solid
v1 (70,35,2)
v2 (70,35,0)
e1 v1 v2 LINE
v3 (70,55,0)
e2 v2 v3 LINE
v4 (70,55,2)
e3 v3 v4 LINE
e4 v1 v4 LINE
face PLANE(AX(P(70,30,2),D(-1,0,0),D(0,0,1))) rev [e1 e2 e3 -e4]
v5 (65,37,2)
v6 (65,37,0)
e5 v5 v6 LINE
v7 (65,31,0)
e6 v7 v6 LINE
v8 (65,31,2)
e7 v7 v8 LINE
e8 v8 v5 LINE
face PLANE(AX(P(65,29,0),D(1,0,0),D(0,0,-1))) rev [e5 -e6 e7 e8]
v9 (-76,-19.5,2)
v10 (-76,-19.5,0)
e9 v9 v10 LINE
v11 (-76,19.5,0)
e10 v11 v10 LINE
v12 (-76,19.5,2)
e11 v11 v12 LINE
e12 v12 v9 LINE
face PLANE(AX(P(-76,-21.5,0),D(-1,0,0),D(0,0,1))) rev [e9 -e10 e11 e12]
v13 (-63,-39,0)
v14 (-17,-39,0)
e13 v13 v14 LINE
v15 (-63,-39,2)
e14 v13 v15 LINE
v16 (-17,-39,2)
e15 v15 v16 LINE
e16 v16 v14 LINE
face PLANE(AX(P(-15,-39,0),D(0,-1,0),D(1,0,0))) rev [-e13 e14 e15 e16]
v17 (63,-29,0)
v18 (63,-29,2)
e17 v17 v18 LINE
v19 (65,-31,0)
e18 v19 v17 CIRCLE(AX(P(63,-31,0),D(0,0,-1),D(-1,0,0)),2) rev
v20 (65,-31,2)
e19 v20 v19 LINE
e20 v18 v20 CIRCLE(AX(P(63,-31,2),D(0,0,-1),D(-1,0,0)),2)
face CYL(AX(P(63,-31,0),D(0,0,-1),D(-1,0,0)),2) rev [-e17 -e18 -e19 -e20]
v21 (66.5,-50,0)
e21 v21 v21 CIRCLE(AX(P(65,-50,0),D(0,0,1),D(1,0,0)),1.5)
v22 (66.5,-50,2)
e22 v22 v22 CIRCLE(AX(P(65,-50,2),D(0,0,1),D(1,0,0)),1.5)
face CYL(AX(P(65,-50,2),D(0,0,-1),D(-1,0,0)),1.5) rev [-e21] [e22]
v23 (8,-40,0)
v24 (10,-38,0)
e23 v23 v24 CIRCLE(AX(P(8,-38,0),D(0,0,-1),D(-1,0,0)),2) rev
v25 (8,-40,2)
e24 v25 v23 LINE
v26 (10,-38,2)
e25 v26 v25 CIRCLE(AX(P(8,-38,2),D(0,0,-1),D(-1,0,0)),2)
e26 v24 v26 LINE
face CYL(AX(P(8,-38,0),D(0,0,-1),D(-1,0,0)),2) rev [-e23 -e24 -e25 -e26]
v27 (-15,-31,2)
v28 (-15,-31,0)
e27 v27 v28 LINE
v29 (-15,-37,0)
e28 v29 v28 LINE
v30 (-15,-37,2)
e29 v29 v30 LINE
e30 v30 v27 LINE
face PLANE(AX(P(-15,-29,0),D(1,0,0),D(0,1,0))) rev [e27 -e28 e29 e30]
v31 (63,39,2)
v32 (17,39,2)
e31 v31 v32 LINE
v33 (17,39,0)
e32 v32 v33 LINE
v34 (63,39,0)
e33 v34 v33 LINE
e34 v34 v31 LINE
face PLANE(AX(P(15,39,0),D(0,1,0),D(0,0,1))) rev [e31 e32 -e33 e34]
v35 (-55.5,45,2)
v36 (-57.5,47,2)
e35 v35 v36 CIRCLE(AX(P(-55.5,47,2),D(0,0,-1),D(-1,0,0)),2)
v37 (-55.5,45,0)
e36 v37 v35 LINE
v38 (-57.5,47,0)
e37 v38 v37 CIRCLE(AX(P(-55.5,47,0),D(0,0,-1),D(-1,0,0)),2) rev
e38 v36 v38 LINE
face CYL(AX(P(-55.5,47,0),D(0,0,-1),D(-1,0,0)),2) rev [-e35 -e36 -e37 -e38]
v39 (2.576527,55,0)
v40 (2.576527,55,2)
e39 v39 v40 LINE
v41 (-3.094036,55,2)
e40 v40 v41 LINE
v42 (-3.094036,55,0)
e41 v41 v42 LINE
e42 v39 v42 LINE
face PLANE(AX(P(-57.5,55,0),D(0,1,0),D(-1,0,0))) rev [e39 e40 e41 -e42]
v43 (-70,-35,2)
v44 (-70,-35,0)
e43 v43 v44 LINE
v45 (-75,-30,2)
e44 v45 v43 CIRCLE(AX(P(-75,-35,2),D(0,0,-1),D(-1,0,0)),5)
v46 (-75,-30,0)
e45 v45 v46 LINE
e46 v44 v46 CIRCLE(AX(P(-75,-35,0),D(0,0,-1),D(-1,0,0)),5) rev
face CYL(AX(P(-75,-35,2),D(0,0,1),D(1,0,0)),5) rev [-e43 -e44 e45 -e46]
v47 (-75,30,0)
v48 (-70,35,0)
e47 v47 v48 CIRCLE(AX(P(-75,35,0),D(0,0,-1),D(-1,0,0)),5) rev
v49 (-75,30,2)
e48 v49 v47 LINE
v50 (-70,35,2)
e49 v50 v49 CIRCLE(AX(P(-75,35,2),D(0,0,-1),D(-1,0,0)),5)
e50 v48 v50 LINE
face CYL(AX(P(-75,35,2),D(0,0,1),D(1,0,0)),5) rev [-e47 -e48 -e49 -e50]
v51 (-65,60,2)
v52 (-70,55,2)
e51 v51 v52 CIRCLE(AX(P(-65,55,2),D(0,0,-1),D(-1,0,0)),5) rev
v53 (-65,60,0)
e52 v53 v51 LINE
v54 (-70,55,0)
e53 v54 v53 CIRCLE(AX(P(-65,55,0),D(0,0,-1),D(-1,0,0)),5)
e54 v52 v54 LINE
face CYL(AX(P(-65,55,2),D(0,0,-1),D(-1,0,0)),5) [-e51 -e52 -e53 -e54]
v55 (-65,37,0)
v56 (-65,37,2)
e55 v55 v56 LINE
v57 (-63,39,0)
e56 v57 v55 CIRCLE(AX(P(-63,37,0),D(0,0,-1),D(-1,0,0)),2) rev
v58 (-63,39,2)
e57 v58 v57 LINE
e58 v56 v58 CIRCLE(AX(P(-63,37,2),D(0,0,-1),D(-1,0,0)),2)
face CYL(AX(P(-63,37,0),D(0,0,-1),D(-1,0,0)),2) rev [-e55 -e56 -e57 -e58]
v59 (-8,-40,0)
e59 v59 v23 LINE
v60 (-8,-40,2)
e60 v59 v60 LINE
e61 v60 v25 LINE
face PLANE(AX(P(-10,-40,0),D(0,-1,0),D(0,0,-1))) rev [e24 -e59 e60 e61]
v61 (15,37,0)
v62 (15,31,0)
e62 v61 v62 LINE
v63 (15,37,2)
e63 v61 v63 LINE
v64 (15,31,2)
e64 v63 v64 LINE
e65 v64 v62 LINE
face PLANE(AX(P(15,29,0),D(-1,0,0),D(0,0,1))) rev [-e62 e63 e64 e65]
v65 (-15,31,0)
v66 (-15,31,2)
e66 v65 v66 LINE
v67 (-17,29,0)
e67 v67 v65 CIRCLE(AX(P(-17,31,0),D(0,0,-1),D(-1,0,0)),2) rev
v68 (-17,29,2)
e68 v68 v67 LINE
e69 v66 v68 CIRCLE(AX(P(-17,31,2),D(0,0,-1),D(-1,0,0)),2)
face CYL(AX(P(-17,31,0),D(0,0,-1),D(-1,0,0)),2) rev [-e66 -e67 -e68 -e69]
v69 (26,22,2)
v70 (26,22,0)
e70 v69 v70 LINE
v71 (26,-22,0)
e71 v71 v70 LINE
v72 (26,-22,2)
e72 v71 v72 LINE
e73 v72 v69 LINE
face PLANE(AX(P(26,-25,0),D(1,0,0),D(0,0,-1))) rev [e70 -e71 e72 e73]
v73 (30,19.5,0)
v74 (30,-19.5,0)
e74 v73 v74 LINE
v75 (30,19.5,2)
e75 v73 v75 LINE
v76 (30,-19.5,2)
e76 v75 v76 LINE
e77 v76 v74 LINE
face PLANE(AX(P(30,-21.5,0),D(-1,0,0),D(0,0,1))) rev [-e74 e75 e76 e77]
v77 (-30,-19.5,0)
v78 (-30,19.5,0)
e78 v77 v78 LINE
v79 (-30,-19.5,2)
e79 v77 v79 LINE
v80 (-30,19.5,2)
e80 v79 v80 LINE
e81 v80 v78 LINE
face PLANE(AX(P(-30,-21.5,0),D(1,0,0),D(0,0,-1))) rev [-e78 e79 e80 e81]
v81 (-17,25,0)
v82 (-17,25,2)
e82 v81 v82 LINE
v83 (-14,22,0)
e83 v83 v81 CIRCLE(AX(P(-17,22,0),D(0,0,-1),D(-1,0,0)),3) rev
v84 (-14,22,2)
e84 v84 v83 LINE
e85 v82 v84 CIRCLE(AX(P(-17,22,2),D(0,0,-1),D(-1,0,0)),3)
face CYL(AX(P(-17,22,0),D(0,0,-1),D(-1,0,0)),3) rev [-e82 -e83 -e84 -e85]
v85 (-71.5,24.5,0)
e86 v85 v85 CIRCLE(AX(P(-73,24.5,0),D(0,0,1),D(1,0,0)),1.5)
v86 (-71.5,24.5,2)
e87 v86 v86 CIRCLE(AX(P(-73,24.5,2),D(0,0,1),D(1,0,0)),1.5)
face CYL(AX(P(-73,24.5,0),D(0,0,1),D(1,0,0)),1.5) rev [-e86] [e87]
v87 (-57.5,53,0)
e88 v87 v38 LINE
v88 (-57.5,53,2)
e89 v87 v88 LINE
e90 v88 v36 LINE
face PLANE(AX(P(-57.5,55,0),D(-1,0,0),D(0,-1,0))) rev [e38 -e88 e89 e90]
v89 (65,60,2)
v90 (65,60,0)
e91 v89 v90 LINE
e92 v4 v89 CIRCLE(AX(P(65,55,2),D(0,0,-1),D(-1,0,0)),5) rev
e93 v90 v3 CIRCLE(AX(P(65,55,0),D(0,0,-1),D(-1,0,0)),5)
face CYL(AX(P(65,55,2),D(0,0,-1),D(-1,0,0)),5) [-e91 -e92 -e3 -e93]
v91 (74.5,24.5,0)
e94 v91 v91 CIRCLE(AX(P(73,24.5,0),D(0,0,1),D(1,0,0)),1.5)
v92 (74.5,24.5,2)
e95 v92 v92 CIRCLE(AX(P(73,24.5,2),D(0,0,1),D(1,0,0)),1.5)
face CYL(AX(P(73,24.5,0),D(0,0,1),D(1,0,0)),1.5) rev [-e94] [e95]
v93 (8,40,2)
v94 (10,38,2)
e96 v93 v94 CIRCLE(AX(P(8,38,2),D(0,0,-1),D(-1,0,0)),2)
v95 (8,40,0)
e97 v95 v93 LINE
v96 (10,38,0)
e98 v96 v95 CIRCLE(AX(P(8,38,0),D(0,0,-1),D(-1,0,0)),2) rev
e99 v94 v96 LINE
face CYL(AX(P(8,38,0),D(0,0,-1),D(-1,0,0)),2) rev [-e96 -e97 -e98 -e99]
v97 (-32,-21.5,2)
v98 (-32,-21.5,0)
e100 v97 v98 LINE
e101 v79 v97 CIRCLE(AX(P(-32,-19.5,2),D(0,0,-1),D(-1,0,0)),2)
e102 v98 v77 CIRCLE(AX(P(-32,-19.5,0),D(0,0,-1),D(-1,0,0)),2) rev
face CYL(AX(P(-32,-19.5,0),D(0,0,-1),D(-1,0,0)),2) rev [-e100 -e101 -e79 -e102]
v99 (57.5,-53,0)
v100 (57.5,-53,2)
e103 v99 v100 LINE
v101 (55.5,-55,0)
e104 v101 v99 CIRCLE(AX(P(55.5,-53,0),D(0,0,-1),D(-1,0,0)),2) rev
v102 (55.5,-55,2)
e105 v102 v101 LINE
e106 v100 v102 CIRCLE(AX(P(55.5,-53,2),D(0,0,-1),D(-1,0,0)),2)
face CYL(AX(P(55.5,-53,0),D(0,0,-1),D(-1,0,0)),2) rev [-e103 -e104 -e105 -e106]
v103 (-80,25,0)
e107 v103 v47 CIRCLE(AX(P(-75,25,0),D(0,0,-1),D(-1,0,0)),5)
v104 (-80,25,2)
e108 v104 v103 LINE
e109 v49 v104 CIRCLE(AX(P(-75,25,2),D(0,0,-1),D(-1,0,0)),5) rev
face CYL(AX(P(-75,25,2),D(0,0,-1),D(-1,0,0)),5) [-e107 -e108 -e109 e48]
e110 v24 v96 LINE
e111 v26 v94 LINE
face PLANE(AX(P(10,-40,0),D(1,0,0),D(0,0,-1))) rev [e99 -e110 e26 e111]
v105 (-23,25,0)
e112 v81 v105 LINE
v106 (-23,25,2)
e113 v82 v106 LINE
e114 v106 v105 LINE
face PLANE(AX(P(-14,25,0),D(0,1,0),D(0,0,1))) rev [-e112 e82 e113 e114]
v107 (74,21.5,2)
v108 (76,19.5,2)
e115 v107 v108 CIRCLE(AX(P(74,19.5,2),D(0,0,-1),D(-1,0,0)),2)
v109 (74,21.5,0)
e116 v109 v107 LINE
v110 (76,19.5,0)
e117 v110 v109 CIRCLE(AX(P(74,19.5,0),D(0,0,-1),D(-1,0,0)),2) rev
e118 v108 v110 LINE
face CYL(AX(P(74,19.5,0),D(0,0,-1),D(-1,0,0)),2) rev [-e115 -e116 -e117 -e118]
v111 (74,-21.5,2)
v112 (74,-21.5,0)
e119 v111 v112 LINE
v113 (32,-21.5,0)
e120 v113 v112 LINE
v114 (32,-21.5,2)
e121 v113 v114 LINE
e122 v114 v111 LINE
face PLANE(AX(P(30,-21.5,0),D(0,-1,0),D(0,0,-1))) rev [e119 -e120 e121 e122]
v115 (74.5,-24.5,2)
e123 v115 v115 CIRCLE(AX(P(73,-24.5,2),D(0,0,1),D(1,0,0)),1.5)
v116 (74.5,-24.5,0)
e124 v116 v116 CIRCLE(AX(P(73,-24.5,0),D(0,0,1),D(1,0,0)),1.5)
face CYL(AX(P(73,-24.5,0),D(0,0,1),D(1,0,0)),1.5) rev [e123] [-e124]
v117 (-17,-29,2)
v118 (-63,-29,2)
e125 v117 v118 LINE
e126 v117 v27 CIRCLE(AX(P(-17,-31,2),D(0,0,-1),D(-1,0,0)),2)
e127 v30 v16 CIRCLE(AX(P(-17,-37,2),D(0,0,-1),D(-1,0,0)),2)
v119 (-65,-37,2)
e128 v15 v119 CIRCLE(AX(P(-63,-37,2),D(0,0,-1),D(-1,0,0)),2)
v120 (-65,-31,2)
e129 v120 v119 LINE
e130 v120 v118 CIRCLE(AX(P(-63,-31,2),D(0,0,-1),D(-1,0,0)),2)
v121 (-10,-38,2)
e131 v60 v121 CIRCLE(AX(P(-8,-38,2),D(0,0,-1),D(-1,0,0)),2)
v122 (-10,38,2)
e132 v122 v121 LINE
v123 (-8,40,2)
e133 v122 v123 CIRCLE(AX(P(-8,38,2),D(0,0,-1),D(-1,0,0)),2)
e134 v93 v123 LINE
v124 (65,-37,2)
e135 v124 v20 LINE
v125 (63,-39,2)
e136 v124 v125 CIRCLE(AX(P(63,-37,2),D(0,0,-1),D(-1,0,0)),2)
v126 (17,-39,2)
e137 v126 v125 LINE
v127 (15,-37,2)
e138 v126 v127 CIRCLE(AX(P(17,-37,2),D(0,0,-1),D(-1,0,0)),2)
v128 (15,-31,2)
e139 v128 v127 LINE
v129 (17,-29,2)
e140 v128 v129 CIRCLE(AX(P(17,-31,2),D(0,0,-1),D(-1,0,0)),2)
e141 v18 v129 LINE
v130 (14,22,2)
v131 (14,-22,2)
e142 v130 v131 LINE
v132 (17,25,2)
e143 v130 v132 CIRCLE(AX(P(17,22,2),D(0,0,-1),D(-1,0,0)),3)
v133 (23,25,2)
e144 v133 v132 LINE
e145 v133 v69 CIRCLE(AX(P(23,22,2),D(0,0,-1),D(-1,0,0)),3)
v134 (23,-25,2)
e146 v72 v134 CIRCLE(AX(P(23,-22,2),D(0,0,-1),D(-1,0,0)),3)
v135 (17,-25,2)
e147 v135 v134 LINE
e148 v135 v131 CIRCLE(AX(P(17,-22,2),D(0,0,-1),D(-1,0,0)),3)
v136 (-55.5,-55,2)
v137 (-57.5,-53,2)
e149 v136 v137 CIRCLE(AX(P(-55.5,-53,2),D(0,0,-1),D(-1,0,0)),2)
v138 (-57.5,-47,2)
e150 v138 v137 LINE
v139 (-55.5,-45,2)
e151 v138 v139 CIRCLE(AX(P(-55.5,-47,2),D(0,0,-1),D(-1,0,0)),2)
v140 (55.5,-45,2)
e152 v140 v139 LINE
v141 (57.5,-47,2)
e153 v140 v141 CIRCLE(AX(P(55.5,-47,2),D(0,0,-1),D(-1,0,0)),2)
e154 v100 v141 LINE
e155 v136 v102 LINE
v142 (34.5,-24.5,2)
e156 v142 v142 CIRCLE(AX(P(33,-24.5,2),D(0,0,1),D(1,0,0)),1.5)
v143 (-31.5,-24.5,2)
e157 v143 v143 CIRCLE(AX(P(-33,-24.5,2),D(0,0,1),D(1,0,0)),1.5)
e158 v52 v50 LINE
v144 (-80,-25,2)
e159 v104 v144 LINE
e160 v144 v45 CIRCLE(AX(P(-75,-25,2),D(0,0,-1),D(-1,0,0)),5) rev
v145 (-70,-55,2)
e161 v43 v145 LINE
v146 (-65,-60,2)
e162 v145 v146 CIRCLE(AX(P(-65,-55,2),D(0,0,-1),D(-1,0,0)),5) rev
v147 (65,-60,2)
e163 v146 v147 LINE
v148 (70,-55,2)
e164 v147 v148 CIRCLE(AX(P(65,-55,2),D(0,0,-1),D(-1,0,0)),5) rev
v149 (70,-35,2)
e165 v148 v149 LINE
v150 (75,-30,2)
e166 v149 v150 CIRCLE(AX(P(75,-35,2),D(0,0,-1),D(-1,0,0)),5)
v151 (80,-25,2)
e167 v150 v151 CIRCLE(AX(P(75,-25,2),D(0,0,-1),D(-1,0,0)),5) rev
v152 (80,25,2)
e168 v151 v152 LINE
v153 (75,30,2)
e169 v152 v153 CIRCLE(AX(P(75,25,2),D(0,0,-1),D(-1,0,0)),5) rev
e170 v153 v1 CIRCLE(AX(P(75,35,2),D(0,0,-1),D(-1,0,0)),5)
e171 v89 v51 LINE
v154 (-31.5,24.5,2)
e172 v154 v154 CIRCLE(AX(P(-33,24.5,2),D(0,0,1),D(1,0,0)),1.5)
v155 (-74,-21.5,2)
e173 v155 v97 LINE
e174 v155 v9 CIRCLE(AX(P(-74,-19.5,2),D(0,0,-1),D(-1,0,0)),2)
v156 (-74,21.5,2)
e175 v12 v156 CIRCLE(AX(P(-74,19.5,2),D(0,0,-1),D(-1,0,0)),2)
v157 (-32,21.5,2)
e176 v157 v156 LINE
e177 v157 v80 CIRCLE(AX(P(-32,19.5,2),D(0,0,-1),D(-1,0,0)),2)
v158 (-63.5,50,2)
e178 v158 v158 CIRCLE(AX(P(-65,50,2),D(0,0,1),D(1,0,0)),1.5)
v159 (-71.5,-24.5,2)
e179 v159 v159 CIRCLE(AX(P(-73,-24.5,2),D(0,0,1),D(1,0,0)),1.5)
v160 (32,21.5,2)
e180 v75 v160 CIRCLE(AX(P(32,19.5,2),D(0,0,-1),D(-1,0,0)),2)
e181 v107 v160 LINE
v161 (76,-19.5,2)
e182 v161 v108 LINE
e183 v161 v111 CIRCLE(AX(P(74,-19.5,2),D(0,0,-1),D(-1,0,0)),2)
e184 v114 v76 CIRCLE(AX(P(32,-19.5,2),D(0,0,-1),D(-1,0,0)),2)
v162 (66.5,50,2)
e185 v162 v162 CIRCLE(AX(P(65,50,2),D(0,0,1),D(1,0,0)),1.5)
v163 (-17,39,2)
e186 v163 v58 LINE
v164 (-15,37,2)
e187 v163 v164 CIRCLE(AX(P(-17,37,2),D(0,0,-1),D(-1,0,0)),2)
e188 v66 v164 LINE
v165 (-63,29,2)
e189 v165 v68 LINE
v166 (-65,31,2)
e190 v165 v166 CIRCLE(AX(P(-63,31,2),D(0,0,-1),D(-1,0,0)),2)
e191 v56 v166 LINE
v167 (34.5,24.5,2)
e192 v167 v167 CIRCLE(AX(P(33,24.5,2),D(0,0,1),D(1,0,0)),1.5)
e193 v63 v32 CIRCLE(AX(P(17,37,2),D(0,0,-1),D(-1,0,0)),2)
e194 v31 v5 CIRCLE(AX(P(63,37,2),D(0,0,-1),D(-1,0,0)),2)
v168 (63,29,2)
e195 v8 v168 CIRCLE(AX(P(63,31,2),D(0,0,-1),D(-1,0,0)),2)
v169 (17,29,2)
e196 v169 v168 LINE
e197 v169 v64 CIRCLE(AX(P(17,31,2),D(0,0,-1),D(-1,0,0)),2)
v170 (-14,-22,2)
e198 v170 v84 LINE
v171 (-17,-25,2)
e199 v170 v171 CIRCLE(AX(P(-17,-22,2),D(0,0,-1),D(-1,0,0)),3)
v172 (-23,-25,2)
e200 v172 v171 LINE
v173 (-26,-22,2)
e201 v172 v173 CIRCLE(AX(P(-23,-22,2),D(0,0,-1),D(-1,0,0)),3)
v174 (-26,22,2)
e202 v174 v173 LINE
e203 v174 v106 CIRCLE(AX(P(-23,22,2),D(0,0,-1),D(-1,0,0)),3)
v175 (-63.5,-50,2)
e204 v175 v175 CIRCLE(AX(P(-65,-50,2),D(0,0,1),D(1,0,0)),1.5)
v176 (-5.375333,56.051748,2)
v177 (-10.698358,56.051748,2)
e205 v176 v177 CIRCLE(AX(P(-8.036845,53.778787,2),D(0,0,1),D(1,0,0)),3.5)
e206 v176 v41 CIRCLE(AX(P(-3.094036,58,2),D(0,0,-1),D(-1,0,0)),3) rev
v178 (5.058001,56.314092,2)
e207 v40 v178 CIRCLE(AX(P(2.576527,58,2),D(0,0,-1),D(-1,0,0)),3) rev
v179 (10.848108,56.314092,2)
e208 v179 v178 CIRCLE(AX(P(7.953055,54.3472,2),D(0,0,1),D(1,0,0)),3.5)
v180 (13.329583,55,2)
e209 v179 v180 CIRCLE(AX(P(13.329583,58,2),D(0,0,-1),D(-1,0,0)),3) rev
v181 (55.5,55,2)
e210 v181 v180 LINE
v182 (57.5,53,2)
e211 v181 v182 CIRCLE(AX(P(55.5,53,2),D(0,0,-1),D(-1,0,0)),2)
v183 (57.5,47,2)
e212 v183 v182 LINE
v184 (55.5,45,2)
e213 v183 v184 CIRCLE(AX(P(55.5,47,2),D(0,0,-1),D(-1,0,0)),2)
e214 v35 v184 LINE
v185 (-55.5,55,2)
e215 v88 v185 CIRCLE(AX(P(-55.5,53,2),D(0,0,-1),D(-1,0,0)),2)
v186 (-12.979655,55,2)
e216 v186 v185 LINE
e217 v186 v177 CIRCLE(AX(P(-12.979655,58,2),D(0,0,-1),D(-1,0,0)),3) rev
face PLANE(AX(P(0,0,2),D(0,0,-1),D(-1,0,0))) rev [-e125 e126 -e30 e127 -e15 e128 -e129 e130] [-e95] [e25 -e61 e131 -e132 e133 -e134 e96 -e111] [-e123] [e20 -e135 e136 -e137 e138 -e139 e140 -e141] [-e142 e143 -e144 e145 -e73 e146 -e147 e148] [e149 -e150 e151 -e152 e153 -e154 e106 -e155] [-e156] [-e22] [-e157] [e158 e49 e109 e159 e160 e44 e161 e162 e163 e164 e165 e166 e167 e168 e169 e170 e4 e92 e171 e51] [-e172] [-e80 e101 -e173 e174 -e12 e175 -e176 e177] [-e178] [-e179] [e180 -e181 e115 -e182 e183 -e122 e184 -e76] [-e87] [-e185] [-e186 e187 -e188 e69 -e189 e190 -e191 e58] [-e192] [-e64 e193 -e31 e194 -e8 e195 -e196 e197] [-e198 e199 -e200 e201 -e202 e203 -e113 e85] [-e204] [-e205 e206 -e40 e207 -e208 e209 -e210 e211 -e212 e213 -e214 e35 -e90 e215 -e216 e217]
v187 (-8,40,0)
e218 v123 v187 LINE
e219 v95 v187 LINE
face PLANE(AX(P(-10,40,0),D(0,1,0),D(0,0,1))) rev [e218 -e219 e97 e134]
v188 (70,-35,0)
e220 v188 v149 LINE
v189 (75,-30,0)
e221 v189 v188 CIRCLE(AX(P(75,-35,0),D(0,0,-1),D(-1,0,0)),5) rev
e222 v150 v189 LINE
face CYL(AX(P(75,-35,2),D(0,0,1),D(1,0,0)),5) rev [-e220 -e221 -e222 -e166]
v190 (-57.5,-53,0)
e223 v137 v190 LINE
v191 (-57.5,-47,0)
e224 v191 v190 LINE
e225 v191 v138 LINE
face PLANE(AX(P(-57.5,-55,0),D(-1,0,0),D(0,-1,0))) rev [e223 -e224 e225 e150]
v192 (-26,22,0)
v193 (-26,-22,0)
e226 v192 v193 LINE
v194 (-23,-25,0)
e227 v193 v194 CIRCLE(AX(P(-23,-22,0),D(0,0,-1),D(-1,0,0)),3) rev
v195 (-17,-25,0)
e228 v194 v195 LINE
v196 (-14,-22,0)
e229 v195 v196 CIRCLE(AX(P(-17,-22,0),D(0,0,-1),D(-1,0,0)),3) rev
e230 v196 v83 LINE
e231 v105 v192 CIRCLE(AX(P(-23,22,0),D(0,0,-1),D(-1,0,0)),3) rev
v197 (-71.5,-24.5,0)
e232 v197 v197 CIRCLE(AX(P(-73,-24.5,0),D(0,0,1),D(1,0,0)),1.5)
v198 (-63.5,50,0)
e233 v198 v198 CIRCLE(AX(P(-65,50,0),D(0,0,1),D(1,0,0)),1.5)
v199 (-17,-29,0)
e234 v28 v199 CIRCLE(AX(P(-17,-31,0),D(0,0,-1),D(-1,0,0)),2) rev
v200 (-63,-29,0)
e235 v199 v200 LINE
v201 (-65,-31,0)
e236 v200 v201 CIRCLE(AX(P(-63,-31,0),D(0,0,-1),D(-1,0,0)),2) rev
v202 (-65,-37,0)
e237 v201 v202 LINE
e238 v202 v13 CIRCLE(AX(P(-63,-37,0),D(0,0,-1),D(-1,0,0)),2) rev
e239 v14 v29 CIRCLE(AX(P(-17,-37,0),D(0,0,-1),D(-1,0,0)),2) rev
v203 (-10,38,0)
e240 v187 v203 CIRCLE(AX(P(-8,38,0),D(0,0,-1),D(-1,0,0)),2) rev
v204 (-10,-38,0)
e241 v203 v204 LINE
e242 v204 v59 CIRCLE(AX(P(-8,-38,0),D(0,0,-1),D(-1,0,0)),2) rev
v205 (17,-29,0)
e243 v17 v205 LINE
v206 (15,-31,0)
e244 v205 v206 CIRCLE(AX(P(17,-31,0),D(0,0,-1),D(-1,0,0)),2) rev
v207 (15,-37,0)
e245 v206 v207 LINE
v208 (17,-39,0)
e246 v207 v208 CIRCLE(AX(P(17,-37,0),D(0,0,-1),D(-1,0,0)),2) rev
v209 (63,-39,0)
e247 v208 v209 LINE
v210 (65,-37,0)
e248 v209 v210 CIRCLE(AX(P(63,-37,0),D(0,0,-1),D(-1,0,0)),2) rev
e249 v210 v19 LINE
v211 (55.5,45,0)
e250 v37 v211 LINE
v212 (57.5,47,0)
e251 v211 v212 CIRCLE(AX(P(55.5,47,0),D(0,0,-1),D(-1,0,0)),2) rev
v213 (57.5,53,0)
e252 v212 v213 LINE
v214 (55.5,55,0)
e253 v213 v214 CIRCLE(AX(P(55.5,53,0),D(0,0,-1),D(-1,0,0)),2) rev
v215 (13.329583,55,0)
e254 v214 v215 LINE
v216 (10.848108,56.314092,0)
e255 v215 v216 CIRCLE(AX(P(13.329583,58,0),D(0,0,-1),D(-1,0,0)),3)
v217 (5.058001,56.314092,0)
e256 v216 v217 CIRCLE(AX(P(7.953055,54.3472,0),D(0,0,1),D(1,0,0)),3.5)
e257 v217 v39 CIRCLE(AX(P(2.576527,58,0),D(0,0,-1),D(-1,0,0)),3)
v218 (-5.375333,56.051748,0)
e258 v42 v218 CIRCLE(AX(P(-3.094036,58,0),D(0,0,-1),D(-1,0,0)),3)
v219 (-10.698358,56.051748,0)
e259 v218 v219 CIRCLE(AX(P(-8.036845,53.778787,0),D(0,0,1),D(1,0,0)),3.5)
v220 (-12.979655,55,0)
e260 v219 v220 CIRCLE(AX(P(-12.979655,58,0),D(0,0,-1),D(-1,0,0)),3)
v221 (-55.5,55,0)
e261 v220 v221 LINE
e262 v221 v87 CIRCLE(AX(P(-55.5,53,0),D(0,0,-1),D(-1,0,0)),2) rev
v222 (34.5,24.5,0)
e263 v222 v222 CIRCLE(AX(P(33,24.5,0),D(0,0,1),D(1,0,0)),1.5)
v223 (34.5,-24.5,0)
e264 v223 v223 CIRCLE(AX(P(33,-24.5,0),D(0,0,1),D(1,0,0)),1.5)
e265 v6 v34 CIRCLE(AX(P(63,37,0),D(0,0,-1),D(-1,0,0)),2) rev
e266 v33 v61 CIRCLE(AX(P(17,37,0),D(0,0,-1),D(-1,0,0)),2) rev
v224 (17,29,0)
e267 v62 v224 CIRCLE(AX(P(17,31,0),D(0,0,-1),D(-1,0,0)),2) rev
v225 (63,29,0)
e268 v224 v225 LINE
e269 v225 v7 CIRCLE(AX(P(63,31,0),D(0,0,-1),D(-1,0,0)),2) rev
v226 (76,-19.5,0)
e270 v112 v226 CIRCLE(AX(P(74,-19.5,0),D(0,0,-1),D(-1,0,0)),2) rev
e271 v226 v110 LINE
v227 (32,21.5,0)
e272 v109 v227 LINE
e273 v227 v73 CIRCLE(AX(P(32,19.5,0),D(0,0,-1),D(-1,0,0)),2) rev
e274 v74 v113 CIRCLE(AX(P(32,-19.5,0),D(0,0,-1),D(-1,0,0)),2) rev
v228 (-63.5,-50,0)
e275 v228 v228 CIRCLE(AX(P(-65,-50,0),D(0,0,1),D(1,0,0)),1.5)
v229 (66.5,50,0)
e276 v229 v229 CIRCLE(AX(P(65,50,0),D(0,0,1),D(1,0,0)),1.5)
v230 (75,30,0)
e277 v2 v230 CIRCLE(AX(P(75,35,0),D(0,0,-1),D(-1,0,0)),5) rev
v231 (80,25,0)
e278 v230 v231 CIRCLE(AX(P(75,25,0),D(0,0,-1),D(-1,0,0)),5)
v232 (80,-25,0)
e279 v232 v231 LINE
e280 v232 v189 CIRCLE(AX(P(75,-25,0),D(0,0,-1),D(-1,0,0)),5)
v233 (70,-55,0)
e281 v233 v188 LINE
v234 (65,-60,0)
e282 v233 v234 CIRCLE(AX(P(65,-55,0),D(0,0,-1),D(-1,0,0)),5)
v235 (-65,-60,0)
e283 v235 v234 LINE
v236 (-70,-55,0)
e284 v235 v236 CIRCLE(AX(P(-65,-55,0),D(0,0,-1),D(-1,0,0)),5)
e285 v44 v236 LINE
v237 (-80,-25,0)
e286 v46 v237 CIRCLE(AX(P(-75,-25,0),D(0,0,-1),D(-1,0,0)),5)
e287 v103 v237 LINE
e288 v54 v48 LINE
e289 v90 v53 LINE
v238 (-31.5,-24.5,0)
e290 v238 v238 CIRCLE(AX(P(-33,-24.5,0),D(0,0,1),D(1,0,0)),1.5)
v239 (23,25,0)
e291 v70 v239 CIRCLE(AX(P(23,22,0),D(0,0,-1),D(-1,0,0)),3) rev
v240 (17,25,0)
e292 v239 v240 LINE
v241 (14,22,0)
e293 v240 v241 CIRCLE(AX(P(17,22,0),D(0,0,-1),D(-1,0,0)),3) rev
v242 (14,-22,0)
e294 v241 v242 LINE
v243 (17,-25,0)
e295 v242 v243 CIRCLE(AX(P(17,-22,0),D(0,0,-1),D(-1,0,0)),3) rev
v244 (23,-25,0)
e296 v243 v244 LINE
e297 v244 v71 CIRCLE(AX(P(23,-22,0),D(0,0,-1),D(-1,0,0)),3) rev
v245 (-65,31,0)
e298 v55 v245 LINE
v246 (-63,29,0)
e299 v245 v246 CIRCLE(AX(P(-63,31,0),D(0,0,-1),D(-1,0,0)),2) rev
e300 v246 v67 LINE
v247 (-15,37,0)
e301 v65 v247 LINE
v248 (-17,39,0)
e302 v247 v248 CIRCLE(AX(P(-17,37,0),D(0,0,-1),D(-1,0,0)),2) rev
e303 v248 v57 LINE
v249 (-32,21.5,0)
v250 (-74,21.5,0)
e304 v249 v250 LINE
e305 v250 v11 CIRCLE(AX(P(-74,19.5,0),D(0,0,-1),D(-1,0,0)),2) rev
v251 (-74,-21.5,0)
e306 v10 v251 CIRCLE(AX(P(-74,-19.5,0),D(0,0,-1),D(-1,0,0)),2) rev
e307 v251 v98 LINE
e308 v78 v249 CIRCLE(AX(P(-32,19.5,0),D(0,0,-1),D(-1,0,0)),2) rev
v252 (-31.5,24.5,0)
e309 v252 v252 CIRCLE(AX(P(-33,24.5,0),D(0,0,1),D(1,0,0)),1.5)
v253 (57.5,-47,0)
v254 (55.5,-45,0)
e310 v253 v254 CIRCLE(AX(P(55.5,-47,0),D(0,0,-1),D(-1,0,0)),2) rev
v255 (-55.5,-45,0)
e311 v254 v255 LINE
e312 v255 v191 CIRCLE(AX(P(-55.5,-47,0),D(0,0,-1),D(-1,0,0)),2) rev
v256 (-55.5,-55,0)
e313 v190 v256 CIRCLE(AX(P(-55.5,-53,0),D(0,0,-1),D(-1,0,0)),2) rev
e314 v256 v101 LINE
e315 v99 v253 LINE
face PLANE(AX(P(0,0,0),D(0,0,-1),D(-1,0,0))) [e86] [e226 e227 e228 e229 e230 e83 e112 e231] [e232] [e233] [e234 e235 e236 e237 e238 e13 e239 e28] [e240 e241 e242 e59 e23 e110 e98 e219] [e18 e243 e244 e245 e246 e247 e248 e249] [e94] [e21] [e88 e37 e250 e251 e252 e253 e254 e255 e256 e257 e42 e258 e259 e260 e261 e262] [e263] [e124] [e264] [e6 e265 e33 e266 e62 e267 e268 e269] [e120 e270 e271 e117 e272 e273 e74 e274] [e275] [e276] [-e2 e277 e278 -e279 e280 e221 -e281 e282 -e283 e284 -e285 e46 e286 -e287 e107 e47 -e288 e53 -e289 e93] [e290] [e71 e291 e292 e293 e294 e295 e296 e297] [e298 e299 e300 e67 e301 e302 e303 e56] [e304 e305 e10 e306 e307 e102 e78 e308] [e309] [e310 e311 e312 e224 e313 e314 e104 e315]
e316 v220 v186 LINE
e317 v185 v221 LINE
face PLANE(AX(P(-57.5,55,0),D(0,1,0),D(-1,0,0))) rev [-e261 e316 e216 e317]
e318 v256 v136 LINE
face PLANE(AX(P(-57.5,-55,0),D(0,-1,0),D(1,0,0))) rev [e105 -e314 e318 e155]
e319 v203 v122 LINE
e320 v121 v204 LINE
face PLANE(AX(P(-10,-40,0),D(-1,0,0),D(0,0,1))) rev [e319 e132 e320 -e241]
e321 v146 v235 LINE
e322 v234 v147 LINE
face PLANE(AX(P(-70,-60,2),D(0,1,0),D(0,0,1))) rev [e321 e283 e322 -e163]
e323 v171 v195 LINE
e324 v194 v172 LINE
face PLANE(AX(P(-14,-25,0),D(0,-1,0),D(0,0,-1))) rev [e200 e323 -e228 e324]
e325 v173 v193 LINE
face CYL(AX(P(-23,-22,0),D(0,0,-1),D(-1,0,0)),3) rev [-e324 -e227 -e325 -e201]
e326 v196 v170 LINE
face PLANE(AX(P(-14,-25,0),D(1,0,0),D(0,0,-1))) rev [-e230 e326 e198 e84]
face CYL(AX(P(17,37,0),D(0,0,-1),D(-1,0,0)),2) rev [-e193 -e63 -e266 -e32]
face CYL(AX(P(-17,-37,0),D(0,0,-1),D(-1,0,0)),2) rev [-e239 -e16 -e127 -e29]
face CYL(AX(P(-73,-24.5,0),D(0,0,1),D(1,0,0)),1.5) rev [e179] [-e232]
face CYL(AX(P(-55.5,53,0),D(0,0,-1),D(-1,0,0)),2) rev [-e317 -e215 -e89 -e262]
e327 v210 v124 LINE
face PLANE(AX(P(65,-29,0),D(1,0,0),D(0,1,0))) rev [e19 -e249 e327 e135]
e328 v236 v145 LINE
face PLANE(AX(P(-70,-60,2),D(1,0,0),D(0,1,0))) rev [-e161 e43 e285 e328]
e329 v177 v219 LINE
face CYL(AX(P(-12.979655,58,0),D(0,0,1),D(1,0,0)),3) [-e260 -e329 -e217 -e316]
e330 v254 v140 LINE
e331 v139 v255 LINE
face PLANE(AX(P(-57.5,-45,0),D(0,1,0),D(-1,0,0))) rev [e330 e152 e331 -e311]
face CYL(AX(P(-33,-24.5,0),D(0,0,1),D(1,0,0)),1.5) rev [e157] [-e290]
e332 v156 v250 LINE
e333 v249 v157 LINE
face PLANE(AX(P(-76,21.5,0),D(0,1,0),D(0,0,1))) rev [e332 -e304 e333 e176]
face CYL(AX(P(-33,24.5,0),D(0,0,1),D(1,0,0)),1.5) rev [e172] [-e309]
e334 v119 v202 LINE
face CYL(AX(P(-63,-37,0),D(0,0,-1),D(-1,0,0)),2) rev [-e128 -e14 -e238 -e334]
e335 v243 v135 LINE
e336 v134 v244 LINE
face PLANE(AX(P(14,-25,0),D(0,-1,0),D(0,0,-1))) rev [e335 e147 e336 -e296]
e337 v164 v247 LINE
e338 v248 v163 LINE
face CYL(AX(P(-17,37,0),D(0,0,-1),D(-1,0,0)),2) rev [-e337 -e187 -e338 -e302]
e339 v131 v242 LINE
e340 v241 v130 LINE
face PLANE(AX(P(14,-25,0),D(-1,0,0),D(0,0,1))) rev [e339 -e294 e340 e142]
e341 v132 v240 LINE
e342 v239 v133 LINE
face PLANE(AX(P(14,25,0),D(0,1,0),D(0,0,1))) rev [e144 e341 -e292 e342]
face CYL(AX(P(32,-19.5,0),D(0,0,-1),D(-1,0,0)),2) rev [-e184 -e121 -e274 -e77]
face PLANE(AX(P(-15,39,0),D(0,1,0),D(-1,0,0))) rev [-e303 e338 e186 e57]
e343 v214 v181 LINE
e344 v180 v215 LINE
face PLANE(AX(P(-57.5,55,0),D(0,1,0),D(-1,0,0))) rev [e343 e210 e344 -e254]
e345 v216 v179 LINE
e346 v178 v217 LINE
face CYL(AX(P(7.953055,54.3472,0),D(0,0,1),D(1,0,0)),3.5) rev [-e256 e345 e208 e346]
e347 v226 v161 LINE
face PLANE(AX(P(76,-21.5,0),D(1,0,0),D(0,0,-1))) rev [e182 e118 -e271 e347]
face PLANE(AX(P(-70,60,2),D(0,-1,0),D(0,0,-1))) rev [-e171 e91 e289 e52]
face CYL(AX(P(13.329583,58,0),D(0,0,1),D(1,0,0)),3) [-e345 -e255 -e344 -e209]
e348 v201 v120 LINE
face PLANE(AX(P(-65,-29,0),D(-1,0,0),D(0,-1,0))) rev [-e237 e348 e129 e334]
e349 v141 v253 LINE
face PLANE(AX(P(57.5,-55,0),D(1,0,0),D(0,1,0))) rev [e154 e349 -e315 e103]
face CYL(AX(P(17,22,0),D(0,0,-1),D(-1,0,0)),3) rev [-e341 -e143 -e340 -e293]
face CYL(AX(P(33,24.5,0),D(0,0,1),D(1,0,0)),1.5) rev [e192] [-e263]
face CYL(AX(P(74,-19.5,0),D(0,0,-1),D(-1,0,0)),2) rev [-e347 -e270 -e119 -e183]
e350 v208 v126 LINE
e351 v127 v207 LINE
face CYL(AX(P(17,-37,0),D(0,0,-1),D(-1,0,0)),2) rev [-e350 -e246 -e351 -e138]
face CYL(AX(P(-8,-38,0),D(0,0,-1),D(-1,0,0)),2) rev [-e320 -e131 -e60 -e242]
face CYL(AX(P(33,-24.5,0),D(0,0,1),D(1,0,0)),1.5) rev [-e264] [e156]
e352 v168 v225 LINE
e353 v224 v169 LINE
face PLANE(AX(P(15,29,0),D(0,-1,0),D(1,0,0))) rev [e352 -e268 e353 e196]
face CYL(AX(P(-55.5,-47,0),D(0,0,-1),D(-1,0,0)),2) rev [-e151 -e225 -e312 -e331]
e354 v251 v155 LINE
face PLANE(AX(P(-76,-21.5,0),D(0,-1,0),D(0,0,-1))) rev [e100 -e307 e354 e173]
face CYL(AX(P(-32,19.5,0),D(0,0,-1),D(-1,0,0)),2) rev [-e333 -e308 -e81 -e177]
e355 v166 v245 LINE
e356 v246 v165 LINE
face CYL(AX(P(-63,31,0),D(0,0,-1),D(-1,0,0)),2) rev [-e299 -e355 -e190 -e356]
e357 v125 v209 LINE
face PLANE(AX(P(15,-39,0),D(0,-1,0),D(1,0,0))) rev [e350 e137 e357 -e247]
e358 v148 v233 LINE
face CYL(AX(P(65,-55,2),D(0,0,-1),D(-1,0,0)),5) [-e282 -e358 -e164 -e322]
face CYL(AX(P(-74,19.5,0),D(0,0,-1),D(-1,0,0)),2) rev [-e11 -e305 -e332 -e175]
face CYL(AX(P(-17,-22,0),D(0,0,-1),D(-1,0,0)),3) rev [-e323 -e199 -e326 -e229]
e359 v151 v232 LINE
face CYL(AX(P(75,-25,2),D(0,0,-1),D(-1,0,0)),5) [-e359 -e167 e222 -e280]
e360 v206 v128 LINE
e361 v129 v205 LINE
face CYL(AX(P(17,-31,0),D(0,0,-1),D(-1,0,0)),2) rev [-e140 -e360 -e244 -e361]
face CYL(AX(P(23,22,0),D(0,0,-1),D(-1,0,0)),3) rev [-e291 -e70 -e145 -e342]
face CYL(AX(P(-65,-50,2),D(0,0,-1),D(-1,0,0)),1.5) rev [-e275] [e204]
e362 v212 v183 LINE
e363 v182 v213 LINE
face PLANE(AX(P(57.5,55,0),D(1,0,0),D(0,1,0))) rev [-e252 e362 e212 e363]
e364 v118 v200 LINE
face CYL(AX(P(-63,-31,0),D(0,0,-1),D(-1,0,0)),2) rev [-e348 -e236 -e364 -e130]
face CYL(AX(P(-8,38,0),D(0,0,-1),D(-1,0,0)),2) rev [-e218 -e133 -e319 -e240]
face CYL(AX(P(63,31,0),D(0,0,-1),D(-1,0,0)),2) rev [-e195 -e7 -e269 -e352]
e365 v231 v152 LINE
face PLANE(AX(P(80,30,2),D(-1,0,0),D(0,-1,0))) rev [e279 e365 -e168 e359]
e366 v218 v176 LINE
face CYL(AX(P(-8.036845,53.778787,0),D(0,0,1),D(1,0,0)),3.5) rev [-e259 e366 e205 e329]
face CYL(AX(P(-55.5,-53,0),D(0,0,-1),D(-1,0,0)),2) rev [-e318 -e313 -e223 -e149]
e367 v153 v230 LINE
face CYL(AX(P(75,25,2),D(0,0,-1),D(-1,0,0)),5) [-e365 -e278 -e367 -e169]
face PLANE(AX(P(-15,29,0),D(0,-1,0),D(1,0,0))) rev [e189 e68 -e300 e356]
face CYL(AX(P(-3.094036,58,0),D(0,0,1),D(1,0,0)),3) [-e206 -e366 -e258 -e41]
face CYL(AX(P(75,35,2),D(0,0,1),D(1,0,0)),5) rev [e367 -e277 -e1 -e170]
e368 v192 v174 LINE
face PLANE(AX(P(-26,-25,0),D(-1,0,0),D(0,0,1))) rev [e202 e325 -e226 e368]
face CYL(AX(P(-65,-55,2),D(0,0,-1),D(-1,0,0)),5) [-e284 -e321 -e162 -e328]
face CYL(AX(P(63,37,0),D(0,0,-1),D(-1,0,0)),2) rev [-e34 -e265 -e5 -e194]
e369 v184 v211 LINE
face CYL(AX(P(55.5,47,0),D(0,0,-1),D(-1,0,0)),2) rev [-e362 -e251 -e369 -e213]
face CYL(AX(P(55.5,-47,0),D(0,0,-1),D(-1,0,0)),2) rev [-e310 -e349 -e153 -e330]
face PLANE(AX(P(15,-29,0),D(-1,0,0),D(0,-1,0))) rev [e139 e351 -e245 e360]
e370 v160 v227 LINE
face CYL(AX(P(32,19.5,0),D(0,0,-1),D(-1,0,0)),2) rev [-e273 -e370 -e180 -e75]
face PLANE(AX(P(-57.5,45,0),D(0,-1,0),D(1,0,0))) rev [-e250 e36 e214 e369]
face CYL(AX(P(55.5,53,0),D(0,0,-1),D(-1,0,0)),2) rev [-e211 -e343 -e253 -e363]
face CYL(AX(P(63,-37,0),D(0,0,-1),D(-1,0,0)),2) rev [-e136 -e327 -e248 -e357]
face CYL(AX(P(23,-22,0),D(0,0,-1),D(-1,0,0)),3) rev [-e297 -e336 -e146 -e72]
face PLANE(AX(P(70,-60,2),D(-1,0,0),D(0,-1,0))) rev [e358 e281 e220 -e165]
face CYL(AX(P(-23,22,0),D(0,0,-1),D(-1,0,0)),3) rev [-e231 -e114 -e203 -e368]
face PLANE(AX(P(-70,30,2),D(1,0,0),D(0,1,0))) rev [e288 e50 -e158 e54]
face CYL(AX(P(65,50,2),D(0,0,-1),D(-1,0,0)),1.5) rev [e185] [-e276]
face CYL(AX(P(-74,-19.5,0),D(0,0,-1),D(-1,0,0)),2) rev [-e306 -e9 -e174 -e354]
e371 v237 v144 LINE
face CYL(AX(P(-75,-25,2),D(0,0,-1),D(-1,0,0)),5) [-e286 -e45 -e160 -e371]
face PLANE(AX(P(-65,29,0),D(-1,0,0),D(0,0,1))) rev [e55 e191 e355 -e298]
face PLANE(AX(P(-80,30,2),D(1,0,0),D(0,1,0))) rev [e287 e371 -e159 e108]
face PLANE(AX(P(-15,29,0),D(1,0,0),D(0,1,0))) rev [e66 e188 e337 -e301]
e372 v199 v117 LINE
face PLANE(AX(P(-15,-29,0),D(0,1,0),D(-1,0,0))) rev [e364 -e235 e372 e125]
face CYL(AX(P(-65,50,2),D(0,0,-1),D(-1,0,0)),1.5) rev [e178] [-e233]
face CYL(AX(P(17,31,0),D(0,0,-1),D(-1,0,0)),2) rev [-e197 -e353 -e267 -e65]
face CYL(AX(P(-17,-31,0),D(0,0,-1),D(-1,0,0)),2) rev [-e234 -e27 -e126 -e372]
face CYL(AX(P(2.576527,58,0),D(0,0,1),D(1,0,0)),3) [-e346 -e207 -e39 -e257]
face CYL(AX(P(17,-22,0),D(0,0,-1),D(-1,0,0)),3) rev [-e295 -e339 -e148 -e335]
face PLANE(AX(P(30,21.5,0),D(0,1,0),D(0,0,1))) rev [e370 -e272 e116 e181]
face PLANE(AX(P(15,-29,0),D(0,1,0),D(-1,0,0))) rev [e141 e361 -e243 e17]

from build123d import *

# Parameters (mm, degrees)
SKETCH_1_R          = 1.5
EXTRUDE_1_DEPTH     = 2
SKETCH_2_R          = 1.5
SKETCH_2_W          = 46
SKETCH_2_H          = 43
CUT_EXTRUDE_1_DEPTH = 2
FILLET_1_R          = 2
SKETCH_3_W          = 115
SKETCH_3_H          = 10
CUT_EXTRUDE_2_DEPTH = 2
FILLET_2_R          = 2
SKETCH_4_W          = 20
SKETCH_4_H          = 80
SKETCH_4_W_2        = 50
SKETCH_4_H_2        = 10
CUT_EXTRUDE_3_DEPTH = 2
FILLET_3_R          = 2
FILLET_4_R          = 5
SKETCH_5_R          = 3.5
CUT_EXTRUDE_4_DEPTH = 2
SKETCH_6_W          = 12
SKETCH_6_H          = 50
CUT_EXTRUDE_5_DEPTH = 2
FILLET_5_R          = 3


with BuildPart() as part:
    # 草图1 → 凸台-拉伸1 (new body)
    with BuildSketch(Plane.XY):
        Polygon((-70, -60), (70, -60), (70, -30), (80, -30), (80, 30), (70, 30), (70, 60), (-70, 60), (-70, 30), (-80, 30), (-80, -30), (-70, -30), align=None)
        with Locations((-65, 50)):
            Circle(SKETCH_1_R, mode=Mode.SUBTRACT)
        with Locations((65, 50)):
            Circle(SKETCH_1_R, mode=Mode.SUBTRACT)
        with Locations((65, -50)):
            Circle(SKETCH_1_R, mode=Mode.SUBTRACT)
        with Locations((-65, -50)):
            Circle(SKETCH_1_R, mode=Mode.SUBTRACT)
    extrude(amount=EXTRUDE_1_DEPTH)

    # 草图2 → 切除-拉伸1 (cut)
    with BuildSketch(Plane.XY.offset(2)):
        with Locations((-73, 24.5)):
            Circle(SKETCH_2_R)
        with Locations((-33, 24.5)):
            Circle(SKETCH_2_R)
        with Locations((-73, -24.5)):
            Circle(SKETCH_2_R)
        with Locations((-33, -24.5)):
            Circle(SKETCH_2_R)
        with Locations((33, 24.5)):
            Circle(SKETCH_2_R)
        with Locations((73, 24.5)):
            Circle(SKETCH_2_R)
        with Locations((33, -24.5)):
            Circle(SKETCH_2_R)
        with Locations((73, -24.5)):
            Circle(SKETCH_2_R)
        with Locations((53, 0)):
            Rectangle(SKETCH_2_W, SKETCH_2_H)
        with Locations((-53, 0)):
            Rectangle(SKETCH_2_W, SKETCH_2_H)
    extrude(amount=-CUT_EXTRUDE_1_DEPTH, mode=Mode.SUBTRACT)

    # 圆角1
    fillet_1_edges = [part.edges().sort_by_distance(p)[0] for p in [
        (76, 21.5, 1),
        (76, -21.5, 1),
        (30, -21.5, 1),
        (30, 21.5, 1),
        (-30, 21.5, 1),
        (-30, -21.5, 1),
        (-76, -21.5, 1),
        (-76, 21.5, 1),
    ]]
    fillet(fillet_1_edges, radius=FILLET_1_R)

    # 草图3 → 切除-拉伸2 (cut)
    with BuildSketch(Plane.XY.offset(2)):
        with Locations((0, -50)):
            Rectangle(SKETCH_3_W, SKETCH_3_H)
        with Locations((0, 50)):
            Rectangle(SKETCH_3_W, SKETCH_3_H)
    extrude(amount=-CUT_EXTRUDE_2_DEPTH, mode=Mode.SUBTRACT)

    # 圆角2
    fillet_2_edges = [part.edges().sort_by_distance(p)[0] for p in [
        (57.5, -45, 1),
        (57.5, -55, 1),
        (-57.5, -55, 1),
        (-57.5, -45, 1),
        (-57.5, 45, 1),
        (-57.5, 55, 1),
        (57.5, 55, 1),
        (57.5, 45, 1),
    ]]
    fillet(fillet_2_edges, radius=FILLET_2_R)

    # 草图4 → 切除-拉伸3 (cut)
    with BuildSketch(Plane.XY.offset(2)):
        Rectangle(SKETCH_4_W, SKETCH_4_H)
        with Locations((40, 34)):
            Rectangle(SKETCH_4_W_2, SKETCH_4_H_2)
        with Locations((-40, 34)):
            Rectangle(SKETCH_4_W_2, SKETCH_4_H_2)
        with Locations((40, -34)):
            Rectangle(SKETCH_4_W_2, SKETCH_4_H_2)
        with Locations((-40, -34)):
            Rectangle(SKETCH_4_W_2, SKETCH_4_H_2)
    extrude(amount=-CUT_EXTRUDE_3_DEPTH, mode=Mode.SUBTRACT)

    # 圆角3
    fillet_3_edges = [part.edges().sort_by_distance(p)[0] for p in [
        (-15, -29, 1),
        (-15, -39, 1),
        (-65, -39, 1),
        (-65, -29, 1),
        (15, -29, 1),
        (65, -29, 1),
        (65, -39, 1),
        (15, -39, 1),
        (-15, 39, 1),
        (-15, 29, 1),
        (-65, 29, 1),
        (-65, 39, 1),
        (65, 39, 1),
        (65, 29, 1),
        (15, 29, 1),
        (15, 39, 1),
        (10, 40, 1),
        (10, -40, 1),
        (-10, -40, 1),
        (-10, 40, 1),
    ]]
    fillet(fillet_3_edges, radius=FILLET_3_R)

    # 圆角4
    fillet_4_edges = [part.edges().sort_by_distance(p)[0] for p in [
        (70, -60, 1),
        (-70, -60, 1),
        (70, 30, 1),
        (80, 30, 1),
        (80, -30, 1),
        (70, -30, 1),
        (-70, -30, 1),
        (-80, -30, 1),
        (-80, 30, 1),
        (-70, 30, 1),
        (70, 60, 1),
        (-70, 60, 1),
    ]]
    fillet(fillet_4_edges, radius=FILLET_4_R - 0.0001)  # a hair under: the kernel refuses the full size

    # 草图5 → 切除-拉伸4 (cut)
    with BuildSketch(Plane.XY.offset(2)):
        with Locations((-8.036845279, 53.77878744)):
            Circle(SKETCH_5_R)
        with Locations((7.953054881, 54.34720003)):
            Circle(SKETCH_5_R)
    extrude(amount=-CUT_EXTRUDE_4_DEPTH, mode=Mode.SUBTRACT)

    # 草图6 → 切除-拉伸5 (cut)
    with BuildSketch(Plane.XY.offset(2)):
        with Locations((20, 0)):
            Rectangle(SKETCH_6_W, SKETCH_6_H)
        with Locations((-20, 0)):
            Rectangle(SKETCH_6_W, SKETCH_6_H)
    extrude(amount=-CUT_EXTRUDE_5_DEPTH, mode=Mode.SUBTRACT)

    # 圆角5
    fillet_5_edges = [part.edges().sort_by_distance(p)[0] for p in [
        (11.391637758, 55, 1),
        (4.514472005, 55, 1),
        (-4.756808711, 55, 1),
        (-11.316881846, 55, 1),
        (26, 25, 1),
        (26, -25, 1),
        (14, -25, 1),
        (14, 25, 1),
        (-14, 25, 1),
        (-14, -25, 1),
        (-26, -25, 1),
        (-26, 25, 1),
    ]]
    fillet(fillet_5_edges, radius=FILLET_5_R)


solid = part.part
